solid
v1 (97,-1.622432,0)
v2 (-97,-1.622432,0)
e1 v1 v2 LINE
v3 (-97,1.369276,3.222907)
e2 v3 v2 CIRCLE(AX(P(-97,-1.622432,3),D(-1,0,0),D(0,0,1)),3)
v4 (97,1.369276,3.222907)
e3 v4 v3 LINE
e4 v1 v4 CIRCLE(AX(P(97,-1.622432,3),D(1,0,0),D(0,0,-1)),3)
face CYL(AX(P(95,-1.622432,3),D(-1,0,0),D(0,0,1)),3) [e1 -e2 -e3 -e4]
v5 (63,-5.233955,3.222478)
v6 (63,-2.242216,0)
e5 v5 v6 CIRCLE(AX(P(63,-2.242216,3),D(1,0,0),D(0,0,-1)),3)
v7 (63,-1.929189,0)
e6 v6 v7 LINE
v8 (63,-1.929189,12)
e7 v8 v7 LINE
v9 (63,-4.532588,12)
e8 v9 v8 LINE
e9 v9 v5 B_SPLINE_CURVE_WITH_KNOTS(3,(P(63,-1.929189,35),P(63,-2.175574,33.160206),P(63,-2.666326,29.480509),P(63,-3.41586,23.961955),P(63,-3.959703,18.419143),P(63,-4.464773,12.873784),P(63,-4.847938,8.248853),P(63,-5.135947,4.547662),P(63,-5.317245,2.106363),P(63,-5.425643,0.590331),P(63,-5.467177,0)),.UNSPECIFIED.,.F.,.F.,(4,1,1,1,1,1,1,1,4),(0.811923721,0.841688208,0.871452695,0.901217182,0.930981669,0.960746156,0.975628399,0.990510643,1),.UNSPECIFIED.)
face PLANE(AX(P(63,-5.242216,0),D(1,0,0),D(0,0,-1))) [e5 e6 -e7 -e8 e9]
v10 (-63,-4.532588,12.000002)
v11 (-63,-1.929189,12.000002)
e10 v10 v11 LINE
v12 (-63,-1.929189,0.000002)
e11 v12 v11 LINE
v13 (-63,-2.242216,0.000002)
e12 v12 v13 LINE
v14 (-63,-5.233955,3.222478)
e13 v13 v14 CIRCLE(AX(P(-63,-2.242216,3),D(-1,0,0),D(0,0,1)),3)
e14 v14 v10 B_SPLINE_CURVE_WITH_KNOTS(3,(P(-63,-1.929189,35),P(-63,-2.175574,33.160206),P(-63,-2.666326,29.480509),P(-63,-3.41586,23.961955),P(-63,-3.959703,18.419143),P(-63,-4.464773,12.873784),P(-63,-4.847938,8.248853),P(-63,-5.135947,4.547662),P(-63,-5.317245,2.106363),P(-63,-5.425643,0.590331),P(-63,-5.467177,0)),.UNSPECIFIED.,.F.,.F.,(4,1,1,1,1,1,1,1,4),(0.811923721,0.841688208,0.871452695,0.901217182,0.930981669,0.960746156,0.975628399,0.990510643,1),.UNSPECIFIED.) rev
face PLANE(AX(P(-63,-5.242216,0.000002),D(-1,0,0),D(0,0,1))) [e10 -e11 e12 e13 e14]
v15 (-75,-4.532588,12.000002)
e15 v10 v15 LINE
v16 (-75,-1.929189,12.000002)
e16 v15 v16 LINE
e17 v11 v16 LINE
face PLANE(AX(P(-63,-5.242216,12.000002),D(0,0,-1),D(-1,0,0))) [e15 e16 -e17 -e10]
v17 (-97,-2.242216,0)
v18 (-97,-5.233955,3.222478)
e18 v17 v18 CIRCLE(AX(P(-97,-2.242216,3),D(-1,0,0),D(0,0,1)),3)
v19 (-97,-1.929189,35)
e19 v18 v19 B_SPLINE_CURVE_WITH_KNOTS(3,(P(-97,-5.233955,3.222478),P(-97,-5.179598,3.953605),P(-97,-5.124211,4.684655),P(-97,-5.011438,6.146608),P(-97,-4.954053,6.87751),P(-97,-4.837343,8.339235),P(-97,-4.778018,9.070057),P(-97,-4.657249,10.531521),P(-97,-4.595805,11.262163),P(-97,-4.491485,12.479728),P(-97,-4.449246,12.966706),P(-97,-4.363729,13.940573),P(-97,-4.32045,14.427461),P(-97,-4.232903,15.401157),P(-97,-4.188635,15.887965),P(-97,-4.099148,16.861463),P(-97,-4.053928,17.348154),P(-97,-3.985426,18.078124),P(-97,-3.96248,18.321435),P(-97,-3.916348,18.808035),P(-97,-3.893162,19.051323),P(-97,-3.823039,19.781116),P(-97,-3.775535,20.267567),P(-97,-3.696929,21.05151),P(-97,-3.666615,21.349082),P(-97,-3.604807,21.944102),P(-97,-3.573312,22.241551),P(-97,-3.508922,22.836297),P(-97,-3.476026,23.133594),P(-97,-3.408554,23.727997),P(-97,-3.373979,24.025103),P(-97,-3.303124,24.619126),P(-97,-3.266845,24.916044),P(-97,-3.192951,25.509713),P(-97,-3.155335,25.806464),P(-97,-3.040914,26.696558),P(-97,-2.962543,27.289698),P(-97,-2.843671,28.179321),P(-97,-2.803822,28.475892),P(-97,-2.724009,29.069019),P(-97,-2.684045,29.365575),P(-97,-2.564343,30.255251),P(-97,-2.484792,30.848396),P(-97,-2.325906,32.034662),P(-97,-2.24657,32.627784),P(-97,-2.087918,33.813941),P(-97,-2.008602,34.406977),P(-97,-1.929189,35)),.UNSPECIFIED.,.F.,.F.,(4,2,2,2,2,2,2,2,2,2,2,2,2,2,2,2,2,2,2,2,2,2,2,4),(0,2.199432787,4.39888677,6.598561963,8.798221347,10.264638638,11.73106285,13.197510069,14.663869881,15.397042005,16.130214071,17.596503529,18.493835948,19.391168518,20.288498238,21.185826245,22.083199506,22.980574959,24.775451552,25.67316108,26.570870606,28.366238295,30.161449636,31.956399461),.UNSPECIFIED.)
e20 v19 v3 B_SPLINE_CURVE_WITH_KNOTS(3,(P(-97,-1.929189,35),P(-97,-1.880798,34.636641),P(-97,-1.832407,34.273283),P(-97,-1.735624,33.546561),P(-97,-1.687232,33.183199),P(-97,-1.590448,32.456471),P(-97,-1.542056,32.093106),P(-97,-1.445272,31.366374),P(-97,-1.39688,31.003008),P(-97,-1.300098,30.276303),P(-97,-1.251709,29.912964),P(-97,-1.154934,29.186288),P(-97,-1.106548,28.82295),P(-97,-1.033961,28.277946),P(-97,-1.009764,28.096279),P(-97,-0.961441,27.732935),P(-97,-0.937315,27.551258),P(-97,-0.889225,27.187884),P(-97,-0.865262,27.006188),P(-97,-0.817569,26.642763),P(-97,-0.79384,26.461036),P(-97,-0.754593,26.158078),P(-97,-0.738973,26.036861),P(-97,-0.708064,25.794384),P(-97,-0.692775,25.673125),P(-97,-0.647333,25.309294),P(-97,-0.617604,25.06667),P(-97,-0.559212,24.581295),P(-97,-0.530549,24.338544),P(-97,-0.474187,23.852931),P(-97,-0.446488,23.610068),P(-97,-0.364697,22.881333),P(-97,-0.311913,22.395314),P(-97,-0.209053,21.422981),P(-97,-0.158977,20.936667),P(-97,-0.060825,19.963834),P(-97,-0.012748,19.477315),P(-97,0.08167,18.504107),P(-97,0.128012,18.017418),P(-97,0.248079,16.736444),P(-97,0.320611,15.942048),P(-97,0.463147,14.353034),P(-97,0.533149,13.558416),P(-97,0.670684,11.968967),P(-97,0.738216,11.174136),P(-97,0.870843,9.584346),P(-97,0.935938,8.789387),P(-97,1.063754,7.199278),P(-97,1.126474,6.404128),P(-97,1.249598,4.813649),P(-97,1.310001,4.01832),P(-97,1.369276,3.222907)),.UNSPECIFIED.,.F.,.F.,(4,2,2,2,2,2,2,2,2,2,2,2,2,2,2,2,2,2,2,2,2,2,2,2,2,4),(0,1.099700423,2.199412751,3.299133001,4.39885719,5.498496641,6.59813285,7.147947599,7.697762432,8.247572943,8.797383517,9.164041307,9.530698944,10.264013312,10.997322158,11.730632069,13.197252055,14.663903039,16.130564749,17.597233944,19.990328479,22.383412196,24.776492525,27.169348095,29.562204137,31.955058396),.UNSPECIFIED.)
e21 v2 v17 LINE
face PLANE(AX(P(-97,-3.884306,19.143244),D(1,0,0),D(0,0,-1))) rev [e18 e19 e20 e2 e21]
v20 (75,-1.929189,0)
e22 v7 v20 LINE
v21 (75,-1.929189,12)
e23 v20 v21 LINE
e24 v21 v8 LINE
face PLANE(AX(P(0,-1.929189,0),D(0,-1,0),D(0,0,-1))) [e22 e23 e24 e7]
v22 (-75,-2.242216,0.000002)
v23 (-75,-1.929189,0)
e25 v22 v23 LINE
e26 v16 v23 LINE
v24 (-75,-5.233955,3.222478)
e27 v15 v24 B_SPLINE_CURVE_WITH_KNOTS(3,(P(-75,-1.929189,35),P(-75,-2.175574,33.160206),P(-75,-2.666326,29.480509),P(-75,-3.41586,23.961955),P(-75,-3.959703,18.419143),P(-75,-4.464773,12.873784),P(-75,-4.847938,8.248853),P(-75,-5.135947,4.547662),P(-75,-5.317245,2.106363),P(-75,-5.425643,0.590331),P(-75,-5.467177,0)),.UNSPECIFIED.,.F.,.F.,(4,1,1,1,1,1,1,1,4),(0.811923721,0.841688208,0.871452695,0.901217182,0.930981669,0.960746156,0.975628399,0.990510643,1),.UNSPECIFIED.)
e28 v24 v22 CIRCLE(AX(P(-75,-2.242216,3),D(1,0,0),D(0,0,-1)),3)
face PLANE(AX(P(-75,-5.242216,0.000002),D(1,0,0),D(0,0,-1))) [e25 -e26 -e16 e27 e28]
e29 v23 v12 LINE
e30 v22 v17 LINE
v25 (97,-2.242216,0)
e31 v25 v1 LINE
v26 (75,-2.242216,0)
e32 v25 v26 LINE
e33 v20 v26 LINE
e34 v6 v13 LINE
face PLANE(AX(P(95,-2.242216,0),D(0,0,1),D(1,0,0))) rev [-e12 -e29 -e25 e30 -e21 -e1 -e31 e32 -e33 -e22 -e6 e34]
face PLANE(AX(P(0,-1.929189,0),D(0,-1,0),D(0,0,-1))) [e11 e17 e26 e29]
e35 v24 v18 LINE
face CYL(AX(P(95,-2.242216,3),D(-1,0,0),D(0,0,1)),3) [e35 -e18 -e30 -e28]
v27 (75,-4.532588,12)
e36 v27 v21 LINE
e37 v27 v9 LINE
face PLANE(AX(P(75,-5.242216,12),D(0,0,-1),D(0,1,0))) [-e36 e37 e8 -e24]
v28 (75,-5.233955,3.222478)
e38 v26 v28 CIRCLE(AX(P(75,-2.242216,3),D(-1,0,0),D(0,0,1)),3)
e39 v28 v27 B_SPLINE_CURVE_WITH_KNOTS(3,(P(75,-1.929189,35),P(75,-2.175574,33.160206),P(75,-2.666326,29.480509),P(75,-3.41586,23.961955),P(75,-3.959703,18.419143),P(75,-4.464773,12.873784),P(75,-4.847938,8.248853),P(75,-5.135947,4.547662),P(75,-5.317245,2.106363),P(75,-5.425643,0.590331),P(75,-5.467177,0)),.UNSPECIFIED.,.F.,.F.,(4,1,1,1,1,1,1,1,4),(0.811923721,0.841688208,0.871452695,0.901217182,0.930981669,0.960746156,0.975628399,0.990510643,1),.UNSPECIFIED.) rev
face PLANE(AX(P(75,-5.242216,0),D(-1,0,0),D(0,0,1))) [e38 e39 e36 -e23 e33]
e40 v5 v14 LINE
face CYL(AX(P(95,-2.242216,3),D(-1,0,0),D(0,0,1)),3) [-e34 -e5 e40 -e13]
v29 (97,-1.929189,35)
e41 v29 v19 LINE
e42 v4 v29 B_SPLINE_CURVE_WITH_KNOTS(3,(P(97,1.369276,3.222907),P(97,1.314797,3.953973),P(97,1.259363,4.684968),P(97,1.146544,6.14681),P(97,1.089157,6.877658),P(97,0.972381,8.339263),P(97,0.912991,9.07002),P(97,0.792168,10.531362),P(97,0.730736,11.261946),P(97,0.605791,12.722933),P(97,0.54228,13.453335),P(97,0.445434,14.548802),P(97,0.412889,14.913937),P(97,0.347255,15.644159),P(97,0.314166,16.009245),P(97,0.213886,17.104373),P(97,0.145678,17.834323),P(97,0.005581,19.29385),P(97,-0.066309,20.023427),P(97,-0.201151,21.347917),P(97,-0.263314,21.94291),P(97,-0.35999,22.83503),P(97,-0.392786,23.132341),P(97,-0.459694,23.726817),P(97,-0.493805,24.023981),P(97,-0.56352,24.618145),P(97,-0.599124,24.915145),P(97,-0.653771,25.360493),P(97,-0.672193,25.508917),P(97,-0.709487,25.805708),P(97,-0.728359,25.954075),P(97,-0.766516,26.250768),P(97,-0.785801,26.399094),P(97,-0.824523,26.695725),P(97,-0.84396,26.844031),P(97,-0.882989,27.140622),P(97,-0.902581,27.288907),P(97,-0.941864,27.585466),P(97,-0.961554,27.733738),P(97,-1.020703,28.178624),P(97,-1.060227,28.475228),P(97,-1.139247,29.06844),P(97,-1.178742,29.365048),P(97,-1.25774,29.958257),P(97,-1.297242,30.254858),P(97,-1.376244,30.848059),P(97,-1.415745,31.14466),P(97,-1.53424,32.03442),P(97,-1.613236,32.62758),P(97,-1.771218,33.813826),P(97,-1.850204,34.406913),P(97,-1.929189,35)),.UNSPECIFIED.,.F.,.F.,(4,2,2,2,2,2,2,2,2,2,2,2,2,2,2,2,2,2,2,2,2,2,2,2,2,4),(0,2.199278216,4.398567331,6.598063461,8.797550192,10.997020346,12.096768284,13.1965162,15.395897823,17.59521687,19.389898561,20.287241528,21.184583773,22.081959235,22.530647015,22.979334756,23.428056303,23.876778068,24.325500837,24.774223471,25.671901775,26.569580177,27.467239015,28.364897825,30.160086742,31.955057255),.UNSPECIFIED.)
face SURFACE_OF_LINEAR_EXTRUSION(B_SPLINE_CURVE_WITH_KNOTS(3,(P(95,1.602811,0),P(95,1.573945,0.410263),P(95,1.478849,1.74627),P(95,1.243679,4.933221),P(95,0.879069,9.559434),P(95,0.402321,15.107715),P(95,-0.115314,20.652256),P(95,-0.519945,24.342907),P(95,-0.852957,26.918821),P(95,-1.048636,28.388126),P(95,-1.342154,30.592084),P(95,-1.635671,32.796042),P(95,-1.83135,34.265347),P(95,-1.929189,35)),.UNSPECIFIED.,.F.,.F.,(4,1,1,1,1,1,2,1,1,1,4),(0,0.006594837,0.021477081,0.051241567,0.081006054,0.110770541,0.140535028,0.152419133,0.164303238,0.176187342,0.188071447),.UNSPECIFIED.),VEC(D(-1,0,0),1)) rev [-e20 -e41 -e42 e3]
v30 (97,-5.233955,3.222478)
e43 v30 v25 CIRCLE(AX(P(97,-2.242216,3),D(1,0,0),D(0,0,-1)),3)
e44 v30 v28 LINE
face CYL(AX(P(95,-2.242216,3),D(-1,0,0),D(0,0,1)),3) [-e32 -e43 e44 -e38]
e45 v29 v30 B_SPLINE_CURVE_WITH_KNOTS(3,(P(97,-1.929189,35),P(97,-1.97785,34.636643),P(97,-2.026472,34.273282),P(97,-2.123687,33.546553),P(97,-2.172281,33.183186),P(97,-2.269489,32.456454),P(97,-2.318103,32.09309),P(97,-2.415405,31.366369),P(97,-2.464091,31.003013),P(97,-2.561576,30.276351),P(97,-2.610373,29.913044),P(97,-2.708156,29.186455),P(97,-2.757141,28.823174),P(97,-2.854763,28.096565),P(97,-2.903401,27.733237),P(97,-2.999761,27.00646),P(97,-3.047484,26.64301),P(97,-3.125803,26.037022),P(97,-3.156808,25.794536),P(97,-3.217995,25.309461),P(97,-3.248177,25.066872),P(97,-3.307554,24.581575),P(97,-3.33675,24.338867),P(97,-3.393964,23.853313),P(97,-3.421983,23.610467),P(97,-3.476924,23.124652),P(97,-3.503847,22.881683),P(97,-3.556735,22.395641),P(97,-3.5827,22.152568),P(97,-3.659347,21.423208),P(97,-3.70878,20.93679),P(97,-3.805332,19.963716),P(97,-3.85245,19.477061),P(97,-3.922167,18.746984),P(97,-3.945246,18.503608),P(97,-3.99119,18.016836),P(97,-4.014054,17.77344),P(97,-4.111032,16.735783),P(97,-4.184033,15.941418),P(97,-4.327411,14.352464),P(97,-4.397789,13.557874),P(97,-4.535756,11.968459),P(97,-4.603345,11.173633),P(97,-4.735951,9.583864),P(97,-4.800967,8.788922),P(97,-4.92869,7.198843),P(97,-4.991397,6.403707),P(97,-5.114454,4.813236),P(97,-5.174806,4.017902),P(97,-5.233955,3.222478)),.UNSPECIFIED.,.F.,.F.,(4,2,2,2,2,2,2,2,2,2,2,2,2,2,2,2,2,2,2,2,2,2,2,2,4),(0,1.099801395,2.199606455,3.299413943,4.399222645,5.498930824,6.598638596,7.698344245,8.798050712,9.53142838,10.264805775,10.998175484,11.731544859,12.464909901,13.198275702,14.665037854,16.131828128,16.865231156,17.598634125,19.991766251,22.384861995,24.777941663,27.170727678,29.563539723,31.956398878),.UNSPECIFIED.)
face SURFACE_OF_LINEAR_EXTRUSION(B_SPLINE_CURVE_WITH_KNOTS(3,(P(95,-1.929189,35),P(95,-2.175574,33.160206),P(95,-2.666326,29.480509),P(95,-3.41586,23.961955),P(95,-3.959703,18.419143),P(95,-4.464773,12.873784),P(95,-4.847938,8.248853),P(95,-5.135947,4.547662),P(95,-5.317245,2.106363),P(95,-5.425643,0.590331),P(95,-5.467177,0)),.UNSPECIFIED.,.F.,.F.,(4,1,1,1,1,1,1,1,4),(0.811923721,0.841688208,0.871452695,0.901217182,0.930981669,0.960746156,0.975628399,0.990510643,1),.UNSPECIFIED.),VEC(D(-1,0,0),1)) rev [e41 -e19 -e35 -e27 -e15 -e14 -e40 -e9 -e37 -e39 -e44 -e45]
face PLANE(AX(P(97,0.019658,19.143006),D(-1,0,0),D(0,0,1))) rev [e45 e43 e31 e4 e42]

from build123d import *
from OCP.BRepAlgoAPI import BRepAlgoAPI_Cut
from OCP.TopTools import TopTools_ListOfShape

# Parameters (mm, degrees)
BOSS_EXTRUDE1_DEPTH = 95
SKETCH3_W           = 12
SKETCH3_H           = 12
CUT_EXTRUDE1_DEPTH  = 102.296476593
BOSS_EXTRUDE2_DEPTH = 2
BOSS_EXTRUDE3_START = 2
BOSS_EXTRUDE3_DEPTH = 2


with BuildPart() as part:
    # Sketch2 → Boss-Extrude1 (new, symmetric)
    with BuildSketch(Plane(origin=(0, 0, 0), x_dir=(0, 0, -1), z_dir=(1, 0, 0))):
        with BuildLine():
            Line((0, -2.242215503), (0, -1.62243157))
            ThreePointArc((0, -1.62243157), (-0.959010255, 0.576286434), (-3.22290724, 1.369275695))
            add(Edge.make_bspline(
                [(-3.22290724, 1.369275695), (-3.484450114, 1.349788561), (-5.597006474, 1.191363198), (-9.559434027, 0.879068879), (-15.107714857, 0.402320573), (-20.652255562, -0.115314326), (-24.342907371, -0.519945386), (-26.918820839, -0.852957366), (-28.388126141, -1.048635875), (-30.592084094, -1.34215364), (-32.796042047, -1.635671405), (-34.265347349, -1.831349915), (-35, -1.92918917)],
                knots=[0.017271617, 0.017271617, 0.017271617, 0.017271617, 0.021477081, 0.051241567, 0.081006054, 0.110770541, 0.140535028, 0.140535028, 0.152419133, 0.164303238, 0.176187342, 0.188071447, 0.188071447, 0.188071447, 0.188071447], degree=3))
            add(Edge.make_bspline(
                [(-35, -1.92918917), (-33.160206009, -2.175574393), (-29.480508802, -2.666326476), (-23.9619553, -3.415859901), (-18.419143462, -3.95970265), (-12.8737838, -4.464773446), (-8.248852631, -4.847937782), (-5.031369521, -5.098307213), (-3.664190055, -5.201107216), (-3.222477885, -5.233954728)],
                knots=[0.811923721, 0.811923721, 0.811923721, 0.811923721, 0.841688208, 0.871452695, 0.901217182, 0.930981669, 0.960746156, 0.975628399, 0.982730813, 0.982730813, 0.982730813, 0.982730813], degree=3))
            ThreePointArc((-3.222477885, -5.233954728), (-0.958852486, -4.440787046), (0, -2.242215503))
        make_face()
    extrude(amount=BOSS_EXTRUDE1_DEPTH, both=True)


with BuildPart() as cut_extrude1_tool:
    # Sketch3 → Cut-Extrude1 (new, through all)
    with BuildSketch(Plane(origin=(0, -1.92918917, 0), x_dir=(-1, 0, 0), z_dir=(0, -1, 0))):
        with Locations((-69, -6)):
            Rectangle(SKETCH3_W, SKETCH3_H)
        with Locations((69, -6.000001505)):
            Rectangle(SKETCH3_W, SKETCH3_H)
    extrude(amount=CUT_EXTRUDE1_DEPTH)


with BuildPart() as part_1:
    add(part.part)

    # Cut-Extrude1: cut by cut_extrude1_tool, with a tolerance
    cut_extrude1_stock = TopTools_ListOfShape()
    cut_extrude1_stock.Append(part_1.part.wrapped)
    cut_extrude1_tools = TopTools_ListOfShape()
    cut_extrude1_tools.Append(cut_extrude1_tool.part.wrapped)
    cut_extrude1_cut = BRepAlgoAPI_Cut()
    cut_extrude1_cut.SetArguments(cut_extrude1_stock)
    cut_extrude1_cut.SetTools(cut_extrude1_tools)
    cut_extrude1_cut.SetFuzzyValue(0.00001)
    cut_extrude1_cut.Build()
    add(Compound.cast(cut_extrude1_cut.Shape()).solids(), mode=Mode.REPLACE)

    # Sketch4 → Boss-Extrude2 (add)
    with BuildSketch(Plane.ZY.offset(95)):
        with BuildLine():
            Line((0, -1.62243157), (0, -2.242215503))
            ThreePointArc((0, -2.242215503), (0.958852486, -4.440787046), (3.222477885, -5.233954728))
            add(Edge.make_bspline(
                [(3.222477885, -5.233954728), (3.664190055, -5.201107216), (5.031369521, -5.098307213), (8.248852631, -4.847937782), (12.8737838, -4.464773446), (18.419143462, -3.95970265), (23.9619553, -3.415859901), (29.480508802, -2.666326476), (33.160206009, -2.175574393), (35, -1.92918917)],
                knots=[0.811923721, 0.811923721, 0.811923721, 0.811923721, 0.819026135, 0.833908378, 0.863672865, 0.893437352, 0.923201839, 0.952966326, 0.982730813, 0.982730813, 0.982730813, 0.982730813], degree=3))
            add(Edge.make_bspline(
                [(35, -1.92918917), (32.796042047, -1.635671405), (29.857431443, -1.244314385), (26.918820839, -0.852957366), (24.342907371, -0.519945386), (20.652255562, -0.115314326), (15.107714857, 0.402320573), (9.559434027, 0.879068879), (5.597006474, 1.191363198), (3.484450114, 1.349788561), (3.22290724, 1.369275695)],
                knots=[0.017271617, 0.017271617, 0.017271617, 0.017271617, 0.052923931, 0.064808036, 0.064808036, 0.094572523, 0.12433701, 0.154101497, 0.183865984, 0.188071447, 0.188071447, 0.188071447, 0.188071447], degree=3))
            ThreePointArc((3.22290724, 1.369275695), (0.959010255, 0.576286434), (0, -1.62243157))
        make_face()
    extrude(amount=BOSS_EXTRUDE2_DEPTH)

    # Sketch5 → Boss-Extrude3 (add)
    with BuildSketch(Plane(origin=(95, 0, 0), x_dir=(0, 0, -1), z_dir=(1, 0, 0)).offset(BOSS_EXTRUDE3_START)):
        with BuildLine():
            Line((0, -2.242215503), (0, -1.62243157))
            ThreePointArc((0, -1.62243157), (-0.959010255, 0.576286434), (-3.22290724, 1.369275695))
            add(Edge.make_bspline(
                [(-3.22290724, 1.369275695), (-3.484450114, 1.349788561), (-5.597006474, 1.191363198), (-9.559434027, 0.879068879), (-15.107714857, 0.402320573), (-20.652255562, -0.115314326), (-24.342907371, -0.519945386), (-26.918820839, -0.852957366), (-29.857431443, -1.244314385), (-32.796042047, -1.635671405), (-35, -1.92918917)],
                knots=[0.017271617, 0.017271617, 0.017271617, 0.017271617, 0.021477081, 0.051241567, 0.081006054, 0.110770541, 0.140535028, 0.140535028, 0.152419133, 0.188071447, 0.188071447, 0.188071447, 0.188071447], degree=3))
            add(Edge.make_bspline(
                [(-35, -1.92918917), (-33.160206009, -2.175574393), (-29.480508802, -2.666326476), (-23.9619553, -3.415859901), (-18.419143462, -3.95970265), (-12.8737838, -4.464773446), (-8.248852631, -4.847937782), (-5.031369521, -5.098307213), (-3.664190055, -5.201107216), (-3.222477885, -5.233954728)],
                knots=[0.811923721, 0.811923721, 0.811923721, 0.811923721, 0.841688208, 0.871452695, 0.901217182, 0.930981669, 0.960746156, 0.975628399, 0.982730813, 0.982730813, 0.982730813, 0.982730813], degree=3))
            ThreePointArc((-3.222477885, -5.233954728), (-0.958852486, -4.440787046), (0, -2.242215503))
        make_face()
    extrude(amount=-BOSS_EXTRUDE3_DEPTH)


solid = part_1.part
